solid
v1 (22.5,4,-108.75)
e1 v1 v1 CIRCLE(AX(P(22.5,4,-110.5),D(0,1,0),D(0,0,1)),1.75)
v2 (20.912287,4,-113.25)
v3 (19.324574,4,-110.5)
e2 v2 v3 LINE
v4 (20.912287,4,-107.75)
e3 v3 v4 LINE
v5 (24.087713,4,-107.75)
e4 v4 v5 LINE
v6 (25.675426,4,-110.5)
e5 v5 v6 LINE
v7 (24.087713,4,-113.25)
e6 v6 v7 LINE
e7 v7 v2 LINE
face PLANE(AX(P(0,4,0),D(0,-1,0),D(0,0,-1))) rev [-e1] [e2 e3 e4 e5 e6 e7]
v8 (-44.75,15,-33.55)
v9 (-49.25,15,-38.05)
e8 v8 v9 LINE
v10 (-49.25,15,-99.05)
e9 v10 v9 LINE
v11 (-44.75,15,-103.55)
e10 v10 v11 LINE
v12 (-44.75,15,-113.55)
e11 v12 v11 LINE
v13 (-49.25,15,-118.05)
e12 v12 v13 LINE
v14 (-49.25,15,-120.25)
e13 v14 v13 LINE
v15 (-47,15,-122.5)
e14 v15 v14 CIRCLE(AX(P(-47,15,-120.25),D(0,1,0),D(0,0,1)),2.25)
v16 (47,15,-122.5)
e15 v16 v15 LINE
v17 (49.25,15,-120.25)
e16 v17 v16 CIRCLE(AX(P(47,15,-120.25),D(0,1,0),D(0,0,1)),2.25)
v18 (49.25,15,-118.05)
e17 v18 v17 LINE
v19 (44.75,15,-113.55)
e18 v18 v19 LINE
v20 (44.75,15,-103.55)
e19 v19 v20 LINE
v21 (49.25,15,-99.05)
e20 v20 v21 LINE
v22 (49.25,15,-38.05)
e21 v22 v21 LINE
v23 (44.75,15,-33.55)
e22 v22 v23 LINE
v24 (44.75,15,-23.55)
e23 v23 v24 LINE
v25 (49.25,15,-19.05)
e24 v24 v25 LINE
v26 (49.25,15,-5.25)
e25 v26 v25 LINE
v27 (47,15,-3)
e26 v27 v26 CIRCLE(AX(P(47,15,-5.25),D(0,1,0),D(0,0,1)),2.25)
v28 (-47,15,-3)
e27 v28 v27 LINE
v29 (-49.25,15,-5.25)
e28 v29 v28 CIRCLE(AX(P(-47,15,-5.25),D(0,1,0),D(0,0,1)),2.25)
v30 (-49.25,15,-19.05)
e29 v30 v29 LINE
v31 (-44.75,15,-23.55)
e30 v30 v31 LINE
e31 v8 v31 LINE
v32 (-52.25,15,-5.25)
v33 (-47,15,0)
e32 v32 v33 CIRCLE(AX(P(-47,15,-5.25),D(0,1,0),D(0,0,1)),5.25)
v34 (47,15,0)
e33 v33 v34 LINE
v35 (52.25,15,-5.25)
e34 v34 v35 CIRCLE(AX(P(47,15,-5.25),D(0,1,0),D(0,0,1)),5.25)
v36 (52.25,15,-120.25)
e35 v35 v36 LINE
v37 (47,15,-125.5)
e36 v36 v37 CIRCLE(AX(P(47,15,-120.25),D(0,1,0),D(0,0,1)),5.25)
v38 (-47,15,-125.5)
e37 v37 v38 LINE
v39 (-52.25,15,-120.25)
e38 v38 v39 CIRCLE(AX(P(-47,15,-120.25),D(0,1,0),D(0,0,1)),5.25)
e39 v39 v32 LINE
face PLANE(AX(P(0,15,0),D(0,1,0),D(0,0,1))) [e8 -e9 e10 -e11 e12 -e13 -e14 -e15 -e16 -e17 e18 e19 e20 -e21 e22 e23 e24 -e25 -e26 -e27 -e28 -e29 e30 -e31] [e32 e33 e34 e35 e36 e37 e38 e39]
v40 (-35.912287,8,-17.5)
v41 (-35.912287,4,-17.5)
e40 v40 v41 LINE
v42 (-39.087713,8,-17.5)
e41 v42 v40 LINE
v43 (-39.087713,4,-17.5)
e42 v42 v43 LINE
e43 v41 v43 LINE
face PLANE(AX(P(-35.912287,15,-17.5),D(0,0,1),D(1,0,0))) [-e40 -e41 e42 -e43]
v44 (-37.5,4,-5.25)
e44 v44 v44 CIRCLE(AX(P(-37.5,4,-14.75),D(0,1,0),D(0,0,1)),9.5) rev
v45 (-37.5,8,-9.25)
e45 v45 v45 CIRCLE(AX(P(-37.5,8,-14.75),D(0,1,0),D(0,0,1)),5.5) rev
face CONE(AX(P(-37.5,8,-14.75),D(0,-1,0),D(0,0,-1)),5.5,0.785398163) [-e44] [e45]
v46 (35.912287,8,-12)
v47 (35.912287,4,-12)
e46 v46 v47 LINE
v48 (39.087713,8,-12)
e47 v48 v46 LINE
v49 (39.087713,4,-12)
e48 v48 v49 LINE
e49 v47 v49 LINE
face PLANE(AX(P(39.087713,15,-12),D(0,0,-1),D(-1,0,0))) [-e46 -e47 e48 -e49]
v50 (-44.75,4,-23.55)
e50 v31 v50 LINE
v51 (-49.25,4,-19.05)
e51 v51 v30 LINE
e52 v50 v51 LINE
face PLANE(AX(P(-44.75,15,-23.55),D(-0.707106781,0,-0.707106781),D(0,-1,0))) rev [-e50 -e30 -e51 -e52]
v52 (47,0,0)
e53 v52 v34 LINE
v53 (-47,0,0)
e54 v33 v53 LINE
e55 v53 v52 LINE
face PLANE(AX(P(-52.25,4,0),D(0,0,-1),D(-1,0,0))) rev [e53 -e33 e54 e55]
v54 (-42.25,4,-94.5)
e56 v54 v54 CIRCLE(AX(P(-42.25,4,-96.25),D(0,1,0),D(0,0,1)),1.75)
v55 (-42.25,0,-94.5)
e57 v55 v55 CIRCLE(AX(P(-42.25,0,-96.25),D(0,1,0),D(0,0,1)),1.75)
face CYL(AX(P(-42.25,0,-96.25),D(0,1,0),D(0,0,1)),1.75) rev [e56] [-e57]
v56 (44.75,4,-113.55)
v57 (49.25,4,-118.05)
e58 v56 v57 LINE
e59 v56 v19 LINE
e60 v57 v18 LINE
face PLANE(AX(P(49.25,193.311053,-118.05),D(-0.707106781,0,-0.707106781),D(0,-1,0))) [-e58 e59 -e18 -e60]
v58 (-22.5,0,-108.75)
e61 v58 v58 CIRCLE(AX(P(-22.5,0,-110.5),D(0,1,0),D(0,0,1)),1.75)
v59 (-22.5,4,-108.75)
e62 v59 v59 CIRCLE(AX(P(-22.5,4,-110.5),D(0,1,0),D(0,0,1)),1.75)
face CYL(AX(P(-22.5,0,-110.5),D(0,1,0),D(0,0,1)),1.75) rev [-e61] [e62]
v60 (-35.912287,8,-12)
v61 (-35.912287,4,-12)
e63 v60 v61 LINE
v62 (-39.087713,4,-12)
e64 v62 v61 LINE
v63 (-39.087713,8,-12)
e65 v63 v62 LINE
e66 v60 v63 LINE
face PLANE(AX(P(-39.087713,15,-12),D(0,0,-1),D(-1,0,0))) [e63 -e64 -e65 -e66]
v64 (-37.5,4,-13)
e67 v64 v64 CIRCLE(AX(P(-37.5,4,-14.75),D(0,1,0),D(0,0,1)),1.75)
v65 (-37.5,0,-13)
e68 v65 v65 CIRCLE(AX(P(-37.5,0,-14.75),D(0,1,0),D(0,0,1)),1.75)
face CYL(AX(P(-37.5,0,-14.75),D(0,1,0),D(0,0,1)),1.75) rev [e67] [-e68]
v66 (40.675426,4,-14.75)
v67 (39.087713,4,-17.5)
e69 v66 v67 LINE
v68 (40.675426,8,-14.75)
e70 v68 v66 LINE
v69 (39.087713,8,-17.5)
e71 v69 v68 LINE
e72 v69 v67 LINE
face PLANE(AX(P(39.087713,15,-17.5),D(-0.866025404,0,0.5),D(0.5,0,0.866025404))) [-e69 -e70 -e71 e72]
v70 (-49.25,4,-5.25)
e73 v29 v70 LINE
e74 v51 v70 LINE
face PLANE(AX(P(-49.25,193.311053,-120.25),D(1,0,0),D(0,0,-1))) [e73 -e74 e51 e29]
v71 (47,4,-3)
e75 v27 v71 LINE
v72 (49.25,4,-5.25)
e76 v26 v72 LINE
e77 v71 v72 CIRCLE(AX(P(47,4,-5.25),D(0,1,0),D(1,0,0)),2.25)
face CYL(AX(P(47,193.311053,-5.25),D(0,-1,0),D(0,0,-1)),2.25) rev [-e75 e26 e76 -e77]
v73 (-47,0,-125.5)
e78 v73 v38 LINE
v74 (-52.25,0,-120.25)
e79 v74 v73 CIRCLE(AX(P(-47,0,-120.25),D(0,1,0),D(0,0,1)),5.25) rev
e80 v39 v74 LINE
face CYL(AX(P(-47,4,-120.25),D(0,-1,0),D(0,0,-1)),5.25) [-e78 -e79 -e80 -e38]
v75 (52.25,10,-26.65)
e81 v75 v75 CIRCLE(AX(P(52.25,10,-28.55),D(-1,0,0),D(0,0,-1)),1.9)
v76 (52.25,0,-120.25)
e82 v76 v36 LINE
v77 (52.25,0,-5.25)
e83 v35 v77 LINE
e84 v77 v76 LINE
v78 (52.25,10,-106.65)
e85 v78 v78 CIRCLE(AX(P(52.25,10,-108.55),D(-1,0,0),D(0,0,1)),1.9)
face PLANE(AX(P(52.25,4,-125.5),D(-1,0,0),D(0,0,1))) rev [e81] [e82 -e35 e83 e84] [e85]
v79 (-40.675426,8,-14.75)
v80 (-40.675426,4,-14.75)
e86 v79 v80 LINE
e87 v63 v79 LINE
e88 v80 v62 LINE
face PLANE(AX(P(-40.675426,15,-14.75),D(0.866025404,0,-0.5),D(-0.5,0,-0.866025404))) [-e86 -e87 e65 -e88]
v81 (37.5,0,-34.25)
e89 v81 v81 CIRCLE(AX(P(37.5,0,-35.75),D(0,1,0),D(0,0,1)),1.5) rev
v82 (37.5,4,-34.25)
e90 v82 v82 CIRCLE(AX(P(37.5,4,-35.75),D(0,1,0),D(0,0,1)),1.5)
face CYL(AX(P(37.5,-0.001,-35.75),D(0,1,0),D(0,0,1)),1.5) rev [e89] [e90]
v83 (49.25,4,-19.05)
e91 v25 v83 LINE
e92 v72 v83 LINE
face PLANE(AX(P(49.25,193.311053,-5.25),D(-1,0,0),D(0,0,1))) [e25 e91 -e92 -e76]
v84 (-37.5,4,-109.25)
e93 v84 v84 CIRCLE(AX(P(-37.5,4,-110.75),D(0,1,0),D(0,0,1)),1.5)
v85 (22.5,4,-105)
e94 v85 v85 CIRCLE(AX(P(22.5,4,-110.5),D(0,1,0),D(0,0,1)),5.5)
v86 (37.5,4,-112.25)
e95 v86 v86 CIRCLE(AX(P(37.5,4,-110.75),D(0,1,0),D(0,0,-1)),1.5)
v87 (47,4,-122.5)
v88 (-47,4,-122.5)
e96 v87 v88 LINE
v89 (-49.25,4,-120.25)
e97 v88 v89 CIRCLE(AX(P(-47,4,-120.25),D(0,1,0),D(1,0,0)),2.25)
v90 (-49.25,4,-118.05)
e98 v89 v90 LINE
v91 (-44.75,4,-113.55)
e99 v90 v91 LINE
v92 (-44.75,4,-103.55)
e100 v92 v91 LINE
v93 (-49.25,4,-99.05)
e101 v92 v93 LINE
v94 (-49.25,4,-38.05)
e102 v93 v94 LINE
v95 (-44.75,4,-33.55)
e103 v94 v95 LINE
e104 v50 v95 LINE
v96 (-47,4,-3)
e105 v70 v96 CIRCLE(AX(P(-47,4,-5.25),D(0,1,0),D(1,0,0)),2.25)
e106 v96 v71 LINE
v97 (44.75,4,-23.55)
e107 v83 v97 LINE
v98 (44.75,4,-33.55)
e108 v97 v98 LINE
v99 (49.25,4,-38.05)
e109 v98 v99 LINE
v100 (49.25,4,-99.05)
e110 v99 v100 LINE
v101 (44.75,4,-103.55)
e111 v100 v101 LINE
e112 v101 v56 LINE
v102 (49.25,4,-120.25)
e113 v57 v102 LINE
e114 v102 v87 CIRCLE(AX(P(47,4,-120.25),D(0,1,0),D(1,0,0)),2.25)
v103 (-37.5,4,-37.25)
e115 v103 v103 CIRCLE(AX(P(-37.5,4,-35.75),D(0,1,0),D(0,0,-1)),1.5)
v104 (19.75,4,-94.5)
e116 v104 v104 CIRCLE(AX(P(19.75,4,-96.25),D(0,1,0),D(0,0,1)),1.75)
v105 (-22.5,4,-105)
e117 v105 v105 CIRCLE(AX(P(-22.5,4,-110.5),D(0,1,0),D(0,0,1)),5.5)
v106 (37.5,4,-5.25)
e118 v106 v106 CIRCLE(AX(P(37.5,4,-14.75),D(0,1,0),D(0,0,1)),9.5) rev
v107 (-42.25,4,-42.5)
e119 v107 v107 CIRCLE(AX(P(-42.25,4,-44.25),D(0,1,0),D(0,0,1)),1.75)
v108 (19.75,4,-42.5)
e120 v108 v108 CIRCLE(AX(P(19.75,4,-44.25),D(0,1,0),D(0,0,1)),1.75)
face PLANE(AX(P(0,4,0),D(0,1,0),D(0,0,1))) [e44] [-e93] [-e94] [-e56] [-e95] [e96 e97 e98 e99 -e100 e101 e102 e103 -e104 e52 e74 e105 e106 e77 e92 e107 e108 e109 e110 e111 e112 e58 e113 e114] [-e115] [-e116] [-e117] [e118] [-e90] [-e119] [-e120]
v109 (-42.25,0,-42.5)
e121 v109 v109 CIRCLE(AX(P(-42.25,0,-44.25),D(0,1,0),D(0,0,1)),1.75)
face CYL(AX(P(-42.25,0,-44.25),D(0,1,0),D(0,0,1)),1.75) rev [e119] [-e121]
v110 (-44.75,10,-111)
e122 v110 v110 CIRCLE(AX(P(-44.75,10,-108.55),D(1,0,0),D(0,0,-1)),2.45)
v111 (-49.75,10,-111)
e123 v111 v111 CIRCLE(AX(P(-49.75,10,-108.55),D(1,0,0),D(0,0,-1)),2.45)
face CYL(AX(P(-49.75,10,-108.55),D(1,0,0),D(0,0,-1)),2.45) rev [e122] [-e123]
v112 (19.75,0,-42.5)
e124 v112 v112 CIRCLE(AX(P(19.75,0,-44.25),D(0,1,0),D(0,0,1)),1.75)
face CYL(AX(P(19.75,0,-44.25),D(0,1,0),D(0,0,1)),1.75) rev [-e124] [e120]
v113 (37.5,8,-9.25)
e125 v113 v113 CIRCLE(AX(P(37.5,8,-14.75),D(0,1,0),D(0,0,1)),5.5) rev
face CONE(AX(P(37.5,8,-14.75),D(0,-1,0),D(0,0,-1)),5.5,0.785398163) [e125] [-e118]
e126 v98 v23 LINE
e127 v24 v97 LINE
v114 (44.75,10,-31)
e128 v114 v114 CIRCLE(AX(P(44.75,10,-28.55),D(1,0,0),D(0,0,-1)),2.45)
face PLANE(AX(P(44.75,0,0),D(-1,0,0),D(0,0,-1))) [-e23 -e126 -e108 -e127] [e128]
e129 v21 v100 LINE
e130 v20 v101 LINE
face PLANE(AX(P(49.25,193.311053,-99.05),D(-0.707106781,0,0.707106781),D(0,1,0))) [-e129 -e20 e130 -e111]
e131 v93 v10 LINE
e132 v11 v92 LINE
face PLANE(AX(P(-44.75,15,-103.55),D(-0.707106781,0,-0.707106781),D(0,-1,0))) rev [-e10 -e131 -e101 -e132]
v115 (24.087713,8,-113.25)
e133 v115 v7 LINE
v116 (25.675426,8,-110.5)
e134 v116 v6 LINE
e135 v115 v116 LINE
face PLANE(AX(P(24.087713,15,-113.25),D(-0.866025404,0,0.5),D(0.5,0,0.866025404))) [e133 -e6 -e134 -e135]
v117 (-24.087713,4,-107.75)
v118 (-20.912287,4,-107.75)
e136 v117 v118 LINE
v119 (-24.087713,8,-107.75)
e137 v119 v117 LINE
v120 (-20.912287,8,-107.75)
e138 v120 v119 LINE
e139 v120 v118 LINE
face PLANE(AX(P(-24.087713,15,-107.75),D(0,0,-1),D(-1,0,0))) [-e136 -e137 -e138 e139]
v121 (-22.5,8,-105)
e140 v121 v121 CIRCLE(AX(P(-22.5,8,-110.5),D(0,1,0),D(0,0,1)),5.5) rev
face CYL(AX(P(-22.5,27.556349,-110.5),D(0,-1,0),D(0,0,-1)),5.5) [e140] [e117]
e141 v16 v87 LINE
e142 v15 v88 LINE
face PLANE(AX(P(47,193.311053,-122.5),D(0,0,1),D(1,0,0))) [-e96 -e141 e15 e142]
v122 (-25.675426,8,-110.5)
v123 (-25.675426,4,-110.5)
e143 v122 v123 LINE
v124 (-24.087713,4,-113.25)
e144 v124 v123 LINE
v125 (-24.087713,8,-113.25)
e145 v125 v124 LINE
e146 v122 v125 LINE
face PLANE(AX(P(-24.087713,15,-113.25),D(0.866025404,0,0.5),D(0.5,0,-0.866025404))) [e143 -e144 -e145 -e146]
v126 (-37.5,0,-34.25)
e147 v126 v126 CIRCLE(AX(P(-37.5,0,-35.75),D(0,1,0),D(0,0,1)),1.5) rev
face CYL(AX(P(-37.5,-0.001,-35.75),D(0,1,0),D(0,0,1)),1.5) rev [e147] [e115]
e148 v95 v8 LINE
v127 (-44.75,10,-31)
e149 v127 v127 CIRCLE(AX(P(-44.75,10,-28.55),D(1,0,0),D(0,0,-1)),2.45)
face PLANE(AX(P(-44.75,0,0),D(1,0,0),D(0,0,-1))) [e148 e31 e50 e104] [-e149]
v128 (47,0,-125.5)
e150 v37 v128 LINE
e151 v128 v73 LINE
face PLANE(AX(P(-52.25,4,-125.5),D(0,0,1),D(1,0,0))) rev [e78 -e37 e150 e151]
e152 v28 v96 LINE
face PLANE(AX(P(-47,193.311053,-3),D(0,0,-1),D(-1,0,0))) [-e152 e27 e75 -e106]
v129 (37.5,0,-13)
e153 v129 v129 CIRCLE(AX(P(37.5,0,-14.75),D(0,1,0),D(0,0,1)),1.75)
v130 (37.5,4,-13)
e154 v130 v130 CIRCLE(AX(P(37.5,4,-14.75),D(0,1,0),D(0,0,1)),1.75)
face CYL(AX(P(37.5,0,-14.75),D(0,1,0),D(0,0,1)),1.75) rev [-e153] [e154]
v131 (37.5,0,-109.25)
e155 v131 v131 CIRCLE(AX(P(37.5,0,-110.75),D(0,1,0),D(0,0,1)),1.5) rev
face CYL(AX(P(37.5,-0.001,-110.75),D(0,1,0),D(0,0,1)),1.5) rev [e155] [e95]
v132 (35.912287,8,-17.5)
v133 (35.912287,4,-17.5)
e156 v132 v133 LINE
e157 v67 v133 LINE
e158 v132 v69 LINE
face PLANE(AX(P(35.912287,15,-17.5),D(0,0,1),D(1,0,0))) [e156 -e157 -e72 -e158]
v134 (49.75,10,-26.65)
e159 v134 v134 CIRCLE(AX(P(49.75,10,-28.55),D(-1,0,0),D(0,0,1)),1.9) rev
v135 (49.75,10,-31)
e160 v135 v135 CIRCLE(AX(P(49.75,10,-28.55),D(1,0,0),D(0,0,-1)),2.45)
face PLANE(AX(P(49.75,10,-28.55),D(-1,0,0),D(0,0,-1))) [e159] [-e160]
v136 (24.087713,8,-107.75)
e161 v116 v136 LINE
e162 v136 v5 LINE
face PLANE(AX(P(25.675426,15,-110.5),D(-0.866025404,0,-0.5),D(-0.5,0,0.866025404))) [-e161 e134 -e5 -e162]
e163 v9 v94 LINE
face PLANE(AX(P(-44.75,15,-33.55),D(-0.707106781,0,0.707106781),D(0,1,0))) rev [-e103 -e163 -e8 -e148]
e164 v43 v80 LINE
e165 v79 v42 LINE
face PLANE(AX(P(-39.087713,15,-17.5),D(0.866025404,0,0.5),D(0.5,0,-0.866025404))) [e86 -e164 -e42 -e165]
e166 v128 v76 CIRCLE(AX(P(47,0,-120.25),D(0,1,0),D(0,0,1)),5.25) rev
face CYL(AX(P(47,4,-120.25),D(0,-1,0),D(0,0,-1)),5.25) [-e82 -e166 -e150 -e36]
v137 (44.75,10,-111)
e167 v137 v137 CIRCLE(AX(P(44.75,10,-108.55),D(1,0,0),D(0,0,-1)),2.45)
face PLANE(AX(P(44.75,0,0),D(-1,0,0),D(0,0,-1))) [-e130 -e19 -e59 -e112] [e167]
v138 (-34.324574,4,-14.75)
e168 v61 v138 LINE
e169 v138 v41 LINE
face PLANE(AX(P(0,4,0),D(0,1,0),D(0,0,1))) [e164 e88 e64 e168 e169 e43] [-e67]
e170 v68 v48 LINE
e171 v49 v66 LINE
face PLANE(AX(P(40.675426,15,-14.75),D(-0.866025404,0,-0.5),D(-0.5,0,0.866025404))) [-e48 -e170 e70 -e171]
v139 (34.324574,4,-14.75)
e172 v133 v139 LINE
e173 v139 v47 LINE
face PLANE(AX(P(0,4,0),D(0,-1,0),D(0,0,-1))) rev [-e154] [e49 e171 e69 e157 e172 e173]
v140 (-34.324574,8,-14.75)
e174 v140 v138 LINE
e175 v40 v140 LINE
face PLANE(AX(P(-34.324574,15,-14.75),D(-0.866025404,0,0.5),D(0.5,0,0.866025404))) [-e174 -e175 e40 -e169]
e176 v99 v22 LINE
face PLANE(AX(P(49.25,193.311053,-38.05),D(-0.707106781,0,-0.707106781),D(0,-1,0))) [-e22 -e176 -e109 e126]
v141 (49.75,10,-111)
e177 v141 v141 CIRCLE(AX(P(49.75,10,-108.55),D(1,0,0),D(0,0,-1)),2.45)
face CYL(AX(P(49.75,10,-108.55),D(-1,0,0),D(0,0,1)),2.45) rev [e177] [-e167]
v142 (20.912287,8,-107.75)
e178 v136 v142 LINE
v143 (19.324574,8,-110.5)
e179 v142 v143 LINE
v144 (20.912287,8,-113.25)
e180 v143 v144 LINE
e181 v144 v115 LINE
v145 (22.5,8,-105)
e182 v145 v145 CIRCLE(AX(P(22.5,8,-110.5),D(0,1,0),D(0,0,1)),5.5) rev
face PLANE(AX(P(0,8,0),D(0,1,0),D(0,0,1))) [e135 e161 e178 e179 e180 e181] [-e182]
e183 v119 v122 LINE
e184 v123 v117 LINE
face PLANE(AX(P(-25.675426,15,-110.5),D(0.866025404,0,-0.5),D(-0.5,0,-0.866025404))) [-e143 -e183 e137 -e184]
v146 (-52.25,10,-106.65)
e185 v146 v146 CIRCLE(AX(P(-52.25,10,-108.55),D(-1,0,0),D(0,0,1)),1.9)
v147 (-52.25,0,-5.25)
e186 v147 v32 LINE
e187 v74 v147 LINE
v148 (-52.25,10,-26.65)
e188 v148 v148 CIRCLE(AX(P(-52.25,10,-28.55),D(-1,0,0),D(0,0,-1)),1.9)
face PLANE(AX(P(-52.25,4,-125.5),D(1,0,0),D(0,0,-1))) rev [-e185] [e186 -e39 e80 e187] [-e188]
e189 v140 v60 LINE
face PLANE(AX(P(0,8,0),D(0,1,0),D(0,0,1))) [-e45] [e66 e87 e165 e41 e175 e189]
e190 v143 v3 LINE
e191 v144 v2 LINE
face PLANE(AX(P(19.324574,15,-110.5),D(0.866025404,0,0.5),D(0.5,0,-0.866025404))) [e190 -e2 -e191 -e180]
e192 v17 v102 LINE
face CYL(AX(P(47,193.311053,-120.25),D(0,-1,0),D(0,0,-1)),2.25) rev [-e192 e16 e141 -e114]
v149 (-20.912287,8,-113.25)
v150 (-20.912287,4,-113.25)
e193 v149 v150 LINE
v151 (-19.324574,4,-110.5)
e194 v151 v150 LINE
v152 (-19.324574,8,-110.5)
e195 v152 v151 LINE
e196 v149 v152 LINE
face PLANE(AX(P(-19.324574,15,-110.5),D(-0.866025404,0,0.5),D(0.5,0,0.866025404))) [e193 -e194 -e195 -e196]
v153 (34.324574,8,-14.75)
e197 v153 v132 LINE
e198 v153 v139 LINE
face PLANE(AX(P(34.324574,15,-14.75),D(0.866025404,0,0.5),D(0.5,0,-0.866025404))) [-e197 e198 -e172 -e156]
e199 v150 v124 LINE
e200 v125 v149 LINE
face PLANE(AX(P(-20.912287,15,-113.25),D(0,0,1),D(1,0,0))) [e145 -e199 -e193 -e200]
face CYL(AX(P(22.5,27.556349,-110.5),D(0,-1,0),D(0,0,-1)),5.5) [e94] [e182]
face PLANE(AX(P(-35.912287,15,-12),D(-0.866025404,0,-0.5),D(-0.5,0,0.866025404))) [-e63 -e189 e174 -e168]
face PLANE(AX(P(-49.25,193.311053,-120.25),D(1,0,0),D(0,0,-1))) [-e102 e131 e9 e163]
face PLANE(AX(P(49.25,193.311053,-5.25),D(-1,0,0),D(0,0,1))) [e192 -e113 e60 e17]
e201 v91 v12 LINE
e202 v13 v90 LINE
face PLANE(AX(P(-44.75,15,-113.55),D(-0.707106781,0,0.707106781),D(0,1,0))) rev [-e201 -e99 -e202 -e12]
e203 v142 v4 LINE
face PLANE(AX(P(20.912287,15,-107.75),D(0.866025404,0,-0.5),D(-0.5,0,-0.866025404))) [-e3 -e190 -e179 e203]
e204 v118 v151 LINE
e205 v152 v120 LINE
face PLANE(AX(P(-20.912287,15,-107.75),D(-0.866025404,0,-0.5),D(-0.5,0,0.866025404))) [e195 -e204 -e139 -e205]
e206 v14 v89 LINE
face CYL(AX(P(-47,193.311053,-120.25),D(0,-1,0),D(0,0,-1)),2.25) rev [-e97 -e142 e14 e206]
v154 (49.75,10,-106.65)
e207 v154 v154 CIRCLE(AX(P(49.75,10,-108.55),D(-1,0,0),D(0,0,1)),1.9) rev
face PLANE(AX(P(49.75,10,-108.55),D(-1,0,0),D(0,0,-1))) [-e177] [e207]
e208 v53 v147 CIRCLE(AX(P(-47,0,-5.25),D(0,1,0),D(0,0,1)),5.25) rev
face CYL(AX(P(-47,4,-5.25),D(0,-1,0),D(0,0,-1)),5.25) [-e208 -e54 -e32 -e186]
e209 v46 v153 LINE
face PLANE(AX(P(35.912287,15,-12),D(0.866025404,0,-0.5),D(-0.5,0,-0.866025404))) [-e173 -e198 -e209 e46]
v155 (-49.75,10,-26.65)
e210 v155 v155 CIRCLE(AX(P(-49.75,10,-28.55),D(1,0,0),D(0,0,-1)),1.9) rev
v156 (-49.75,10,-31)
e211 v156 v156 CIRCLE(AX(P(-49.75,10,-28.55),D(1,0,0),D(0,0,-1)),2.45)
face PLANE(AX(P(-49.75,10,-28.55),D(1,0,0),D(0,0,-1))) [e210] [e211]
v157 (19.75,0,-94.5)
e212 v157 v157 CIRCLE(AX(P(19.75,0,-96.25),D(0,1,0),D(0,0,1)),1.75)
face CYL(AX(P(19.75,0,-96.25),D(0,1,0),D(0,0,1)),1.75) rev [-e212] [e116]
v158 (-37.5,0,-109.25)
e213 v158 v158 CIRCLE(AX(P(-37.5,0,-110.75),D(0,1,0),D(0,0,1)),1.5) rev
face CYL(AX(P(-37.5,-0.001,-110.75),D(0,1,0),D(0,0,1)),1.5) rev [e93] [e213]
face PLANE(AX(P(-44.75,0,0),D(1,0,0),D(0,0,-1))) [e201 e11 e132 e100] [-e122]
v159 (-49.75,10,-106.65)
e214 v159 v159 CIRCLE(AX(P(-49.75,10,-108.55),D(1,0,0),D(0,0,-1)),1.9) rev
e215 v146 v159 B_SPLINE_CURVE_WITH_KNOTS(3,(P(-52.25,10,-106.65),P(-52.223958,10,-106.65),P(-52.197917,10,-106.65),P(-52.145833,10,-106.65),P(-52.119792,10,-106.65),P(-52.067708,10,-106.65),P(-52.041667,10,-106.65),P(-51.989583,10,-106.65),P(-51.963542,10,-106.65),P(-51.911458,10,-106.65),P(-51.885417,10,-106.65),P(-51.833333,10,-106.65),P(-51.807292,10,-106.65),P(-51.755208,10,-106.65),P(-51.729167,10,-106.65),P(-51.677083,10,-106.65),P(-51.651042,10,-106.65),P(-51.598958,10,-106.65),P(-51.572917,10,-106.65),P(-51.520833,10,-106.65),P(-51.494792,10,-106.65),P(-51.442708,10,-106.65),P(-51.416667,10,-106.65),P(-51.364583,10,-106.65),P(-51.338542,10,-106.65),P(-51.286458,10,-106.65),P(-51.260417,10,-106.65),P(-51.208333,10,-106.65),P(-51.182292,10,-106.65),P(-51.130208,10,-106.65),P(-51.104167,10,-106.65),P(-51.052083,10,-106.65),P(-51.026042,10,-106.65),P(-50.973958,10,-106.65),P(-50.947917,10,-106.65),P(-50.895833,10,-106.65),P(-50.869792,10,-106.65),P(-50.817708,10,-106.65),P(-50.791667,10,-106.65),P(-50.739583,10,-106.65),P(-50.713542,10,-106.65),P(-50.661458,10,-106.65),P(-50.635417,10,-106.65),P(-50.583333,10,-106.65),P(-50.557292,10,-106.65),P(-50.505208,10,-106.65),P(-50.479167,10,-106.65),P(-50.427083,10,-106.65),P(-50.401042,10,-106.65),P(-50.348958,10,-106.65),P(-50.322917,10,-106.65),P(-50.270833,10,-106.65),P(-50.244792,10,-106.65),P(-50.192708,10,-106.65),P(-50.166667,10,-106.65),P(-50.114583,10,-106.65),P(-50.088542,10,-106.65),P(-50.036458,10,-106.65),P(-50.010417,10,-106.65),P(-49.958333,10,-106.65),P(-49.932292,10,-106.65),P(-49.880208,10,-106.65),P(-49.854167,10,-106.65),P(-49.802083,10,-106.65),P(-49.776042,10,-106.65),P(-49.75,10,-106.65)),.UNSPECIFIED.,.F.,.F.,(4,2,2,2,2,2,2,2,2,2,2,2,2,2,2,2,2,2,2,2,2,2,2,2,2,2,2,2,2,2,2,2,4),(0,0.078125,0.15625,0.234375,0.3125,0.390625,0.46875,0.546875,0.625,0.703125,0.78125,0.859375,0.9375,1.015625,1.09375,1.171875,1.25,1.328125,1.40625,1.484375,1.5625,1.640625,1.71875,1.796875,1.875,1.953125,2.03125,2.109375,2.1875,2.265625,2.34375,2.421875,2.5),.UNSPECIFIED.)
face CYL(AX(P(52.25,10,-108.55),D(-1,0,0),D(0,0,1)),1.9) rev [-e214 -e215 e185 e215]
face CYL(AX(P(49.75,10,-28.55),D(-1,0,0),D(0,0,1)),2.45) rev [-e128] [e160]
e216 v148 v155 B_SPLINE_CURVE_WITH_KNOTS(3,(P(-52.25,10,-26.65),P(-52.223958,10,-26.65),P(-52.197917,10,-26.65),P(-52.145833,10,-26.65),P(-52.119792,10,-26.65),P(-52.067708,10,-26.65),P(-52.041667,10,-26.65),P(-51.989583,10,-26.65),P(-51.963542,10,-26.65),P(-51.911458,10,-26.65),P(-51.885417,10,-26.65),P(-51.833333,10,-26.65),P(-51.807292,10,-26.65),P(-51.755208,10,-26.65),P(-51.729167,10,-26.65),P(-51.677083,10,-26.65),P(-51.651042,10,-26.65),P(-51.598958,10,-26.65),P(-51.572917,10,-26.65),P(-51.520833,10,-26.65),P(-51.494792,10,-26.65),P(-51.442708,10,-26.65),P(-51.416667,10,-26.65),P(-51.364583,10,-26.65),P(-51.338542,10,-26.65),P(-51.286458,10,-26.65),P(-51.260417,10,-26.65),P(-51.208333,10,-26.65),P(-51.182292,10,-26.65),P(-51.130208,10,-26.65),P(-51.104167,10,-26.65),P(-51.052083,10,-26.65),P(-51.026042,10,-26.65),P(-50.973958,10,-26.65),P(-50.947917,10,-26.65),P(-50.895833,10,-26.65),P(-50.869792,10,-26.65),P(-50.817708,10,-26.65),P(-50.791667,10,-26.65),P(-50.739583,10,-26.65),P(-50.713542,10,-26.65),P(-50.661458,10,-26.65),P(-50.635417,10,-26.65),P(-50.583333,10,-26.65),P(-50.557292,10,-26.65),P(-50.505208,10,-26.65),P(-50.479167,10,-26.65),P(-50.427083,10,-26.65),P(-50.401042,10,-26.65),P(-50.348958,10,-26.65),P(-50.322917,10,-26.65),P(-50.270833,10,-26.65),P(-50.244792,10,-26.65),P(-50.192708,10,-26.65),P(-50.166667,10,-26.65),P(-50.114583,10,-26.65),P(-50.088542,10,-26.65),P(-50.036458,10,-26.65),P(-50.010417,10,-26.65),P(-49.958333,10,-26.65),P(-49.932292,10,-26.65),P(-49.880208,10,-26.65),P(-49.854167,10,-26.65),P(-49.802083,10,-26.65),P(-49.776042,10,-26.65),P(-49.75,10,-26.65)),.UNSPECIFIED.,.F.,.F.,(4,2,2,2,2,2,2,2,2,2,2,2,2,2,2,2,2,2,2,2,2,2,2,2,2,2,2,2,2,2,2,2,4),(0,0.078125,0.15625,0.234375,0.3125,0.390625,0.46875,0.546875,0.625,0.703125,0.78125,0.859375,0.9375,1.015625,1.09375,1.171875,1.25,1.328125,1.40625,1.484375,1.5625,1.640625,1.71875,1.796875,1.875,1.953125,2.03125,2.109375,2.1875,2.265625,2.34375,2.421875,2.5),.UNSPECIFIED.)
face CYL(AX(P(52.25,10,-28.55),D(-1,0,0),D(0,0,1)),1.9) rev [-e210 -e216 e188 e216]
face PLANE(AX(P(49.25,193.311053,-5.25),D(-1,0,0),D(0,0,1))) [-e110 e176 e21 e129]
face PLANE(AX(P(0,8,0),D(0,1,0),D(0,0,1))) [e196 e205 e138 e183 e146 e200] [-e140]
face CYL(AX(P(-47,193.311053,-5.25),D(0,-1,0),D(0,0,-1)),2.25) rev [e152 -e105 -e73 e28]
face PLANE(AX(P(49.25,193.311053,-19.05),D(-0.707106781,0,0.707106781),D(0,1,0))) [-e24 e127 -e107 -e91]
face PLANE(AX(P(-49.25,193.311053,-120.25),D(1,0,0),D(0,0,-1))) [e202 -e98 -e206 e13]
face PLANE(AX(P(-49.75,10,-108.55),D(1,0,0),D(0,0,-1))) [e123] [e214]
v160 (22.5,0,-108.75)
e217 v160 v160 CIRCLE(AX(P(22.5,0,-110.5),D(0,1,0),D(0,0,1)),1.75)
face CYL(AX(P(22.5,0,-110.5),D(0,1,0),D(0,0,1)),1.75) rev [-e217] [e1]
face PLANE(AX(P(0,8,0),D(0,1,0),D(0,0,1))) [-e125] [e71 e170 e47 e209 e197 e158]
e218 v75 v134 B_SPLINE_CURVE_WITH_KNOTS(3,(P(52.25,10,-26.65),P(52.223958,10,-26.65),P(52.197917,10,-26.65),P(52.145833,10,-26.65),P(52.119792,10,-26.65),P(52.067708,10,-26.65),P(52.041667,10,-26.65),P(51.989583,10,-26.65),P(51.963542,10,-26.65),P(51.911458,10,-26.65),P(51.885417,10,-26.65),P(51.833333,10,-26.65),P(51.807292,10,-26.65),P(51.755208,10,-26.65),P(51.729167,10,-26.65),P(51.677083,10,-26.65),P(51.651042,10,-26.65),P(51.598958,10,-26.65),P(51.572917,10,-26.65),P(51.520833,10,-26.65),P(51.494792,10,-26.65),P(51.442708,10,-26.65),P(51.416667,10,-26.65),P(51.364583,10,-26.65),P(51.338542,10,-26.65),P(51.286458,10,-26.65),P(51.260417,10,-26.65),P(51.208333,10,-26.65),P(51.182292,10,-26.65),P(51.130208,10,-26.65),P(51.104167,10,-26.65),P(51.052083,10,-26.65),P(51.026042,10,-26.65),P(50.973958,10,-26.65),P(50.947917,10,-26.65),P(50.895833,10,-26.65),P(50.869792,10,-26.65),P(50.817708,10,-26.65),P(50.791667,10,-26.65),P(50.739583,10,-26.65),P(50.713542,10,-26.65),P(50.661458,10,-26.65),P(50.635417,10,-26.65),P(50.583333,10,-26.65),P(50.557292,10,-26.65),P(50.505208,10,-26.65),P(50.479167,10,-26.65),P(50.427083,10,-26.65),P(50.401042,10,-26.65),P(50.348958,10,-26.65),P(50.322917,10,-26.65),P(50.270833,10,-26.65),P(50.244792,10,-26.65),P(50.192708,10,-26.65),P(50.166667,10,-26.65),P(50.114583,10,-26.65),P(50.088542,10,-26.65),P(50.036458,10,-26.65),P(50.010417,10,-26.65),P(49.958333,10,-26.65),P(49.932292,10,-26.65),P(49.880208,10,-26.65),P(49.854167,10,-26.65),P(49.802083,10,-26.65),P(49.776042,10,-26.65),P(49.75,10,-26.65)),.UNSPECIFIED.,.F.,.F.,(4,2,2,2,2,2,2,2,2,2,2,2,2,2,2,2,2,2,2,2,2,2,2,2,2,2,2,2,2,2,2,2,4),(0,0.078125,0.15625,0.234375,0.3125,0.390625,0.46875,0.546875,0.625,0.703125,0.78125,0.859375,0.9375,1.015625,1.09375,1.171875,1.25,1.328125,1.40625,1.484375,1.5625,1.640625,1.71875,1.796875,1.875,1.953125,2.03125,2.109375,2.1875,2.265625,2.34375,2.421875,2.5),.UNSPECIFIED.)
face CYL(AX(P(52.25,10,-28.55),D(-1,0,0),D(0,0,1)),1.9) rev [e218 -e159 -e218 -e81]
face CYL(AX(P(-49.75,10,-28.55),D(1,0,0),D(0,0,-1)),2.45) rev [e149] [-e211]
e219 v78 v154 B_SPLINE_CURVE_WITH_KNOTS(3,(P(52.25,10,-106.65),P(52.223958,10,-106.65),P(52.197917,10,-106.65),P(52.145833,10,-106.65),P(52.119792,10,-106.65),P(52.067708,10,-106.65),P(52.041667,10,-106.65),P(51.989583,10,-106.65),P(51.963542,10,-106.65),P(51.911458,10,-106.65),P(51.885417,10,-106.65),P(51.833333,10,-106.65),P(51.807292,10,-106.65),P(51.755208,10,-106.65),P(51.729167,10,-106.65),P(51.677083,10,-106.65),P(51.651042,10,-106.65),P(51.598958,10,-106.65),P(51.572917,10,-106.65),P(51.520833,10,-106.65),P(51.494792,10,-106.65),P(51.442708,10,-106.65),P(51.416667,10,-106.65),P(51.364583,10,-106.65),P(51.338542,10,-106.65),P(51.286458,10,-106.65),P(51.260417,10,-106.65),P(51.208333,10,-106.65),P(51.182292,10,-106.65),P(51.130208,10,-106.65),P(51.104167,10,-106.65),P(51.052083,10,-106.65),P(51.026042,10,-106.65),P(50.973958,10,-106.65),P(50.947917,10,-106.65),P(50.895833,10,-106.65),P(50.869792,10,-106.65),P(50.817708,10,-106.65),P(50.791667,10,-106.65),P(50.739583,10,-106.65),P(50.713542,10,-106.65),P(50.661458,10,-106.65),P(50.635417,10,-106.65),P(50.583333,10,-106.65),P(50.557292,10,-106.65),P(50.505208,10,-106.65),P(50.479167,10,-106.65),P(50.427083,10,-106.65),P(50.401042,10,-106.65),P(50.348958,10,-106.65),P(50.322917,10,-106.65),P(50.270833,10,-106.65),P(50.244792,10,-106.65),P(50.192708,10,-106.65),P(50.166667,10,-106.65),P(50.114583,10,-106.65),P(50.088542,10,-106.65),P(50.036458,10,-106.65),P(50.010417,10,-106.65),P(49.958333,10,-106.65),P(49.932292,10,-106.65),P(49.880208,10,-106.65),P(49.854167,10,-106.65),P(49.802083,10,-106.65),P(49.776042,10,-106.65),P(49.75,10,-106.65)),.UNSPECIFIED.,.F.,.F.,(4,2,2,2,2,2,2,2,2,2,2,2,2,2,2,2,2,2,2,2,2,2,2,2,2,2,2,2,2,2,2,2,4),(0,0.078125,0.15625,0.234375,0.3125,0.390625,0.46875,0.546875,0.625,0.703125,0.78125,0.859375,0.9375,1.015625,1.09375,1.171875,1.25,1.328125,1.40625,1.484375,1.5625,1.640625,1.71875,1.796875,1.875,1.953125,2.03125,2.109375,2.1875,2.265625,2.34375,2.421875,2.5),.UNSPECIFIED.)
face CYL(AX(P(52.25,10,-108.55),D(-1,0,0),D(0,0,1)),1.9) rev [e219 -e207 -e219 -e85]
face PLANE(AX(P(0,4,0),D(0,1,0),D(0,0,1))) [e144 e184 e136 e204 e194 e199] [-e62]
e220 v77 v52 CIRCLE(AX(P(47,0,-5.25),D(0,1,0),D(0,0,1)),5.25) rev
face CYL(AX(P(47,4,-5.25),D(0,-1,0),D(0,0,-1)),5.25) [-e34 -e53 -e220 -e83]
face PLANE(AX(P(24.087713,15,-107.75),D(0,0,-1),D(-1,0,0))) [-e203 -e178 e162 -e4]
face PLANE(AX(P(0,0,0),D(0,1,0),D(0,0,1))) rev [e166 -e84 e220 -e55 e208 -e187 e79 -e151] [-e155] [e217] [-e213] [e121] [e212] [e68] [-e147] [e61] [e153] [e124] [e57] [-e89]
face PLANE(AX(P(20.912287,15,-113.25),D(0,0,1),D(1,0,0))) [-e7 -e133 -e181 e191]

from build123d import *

# Parameters (mm, degrees)
SKETCH1_W           = 104.5
SKETCH1_H           = 125.5
BOSS_EXTRUDE1_DEPTH = 4
FILLET1_R           = 5.25
EXTRUDE_THIN1_START = 11
EXTRUDE_THIN1_DEPTH = 11
CUT_EXTRUDE2_REACH  = 138.387
SKETCH6_R           = 1.5
SKETCH8_W           = 10
SKETCH8_H           = 11
BOSS_EXTRUDE2_DEPTH = 4.5
CHAMFER2_SIZE       = 4.5
SKETCH5_R           = 1.9
CUT_EXTRUDE3_DEPTH  = 164.998475603
SKETCH10_R          = 2.45
CUT_EXTRUDE4_DEPTH  = 5
SKETCH2_R           = 5.5
BOSS_EXTRUDE3_DEPTH = 8
CUT_EXTRUDE5_DEPTH  = 137.386628743
SKETCH13_R          = 1.75
CUT_EXTRUDE6_DEPTH  = 137.386628743
CHAMFER3_SIZE       = 4
SKETCH14_R          = 1.75
CUT_EXTRUDE7_DEPTH  = 137.386628743


with BuildPart() as part:
    # Sketch1 → Boss-Extrude1 (new body)
    with BuildSketch(Plane(origin=(0, 0, 0), x_dir=(1, 0, 0), z_dir=(0, 1, 0))):
        with Locations((0, 62.75)):
            Rectangle(SKETCH1_W, SKETCH1_H)
    extrude(amount=BOSS_EXTRUDE1_DEPTH)

    # Fillet1
    fillet1_edges = [part.edges().sort_by_distance(p)[0] for p in [
        (-52.25, 2, -125.5),
        (52.25, 2, -125.5),
        (52.25, 2, 0),
        (-52.25, 2, 0),
    ]]
    fillet(fillet1_edges, radius=FILLET1_R)

    # Sketch3 → Extrude-Thin1 (add)
    with BuildSketch(Plane(origin=(0, 4, 0), x_dir=(1, 0, 0), z_dir=(0, 1, 0)).offset(EXTRUDE_THIN1_START)):
        with BuildLine():
            Line((47, 125.5), (-47, 125.5))
            ThreePointArc((-47, 125.5), (-50.712310601, 123.962310601), (-52.25, 120.25))
            Line((-52.25, 120.25), (-52.25, 5.25))
            ThreePointArc((-52.25, 5.25), (-50.712310601, 1.537689399), (-47, 0))
            Line((-47, 0), (47, 0))
            ThreePointArc((47, 0), (50.712310601, 1.537689399), (52.25, 5.25))
            Line((52.25, 5.25), (52.25, 120.25))
            ThreePointArc((52.25, 120.25), (50.712310601, 123.962310601), (47, 125.5))
        make_face()
        with BuildLine():
            Line((47, 122.5), (-47, 122.5))
            ThreePointArc((-47, 122.5), (-48.590990258, 121.840990258), (-49.25, 120.25))
            Line((-49.25, 120.25), (-49.25, 5.25))
            ThreePointArc((-49.25, 5.25), (-48.590990258, 3.659009742), (-47, 3))
            Line((-47, 3), (47, 3))
            ThreePointArc((47, 3), (48.590990258, 3.659009742), (49.25, 5.25))
            Line((49.25, 5.25), (49.25, 120.25))
            ThreePointArc((49.25, 120.25), (48.590990258, 121.840990258), (47, 122.5))
        make_face(mode=Mode.SUBTRACT)
    extrude(amount=-EXTRUDE_THIN1_DEPTH)

    # Sketch6 → Cut-Extrude2 (cut, up to next)
    with BuildSketch(Plane(origin=(0, 4, 0), x_dir=(1, 0, 0), z_dir=(0, 1, 0)), mode=Mode.PRIVATE) as cut_extrude2_sk1:
        with Locations(Location((-37.5, 110.75, 0), (0, 0, 270))):
            Circle(SKETCH6_R)
    cut_extrude2_tool1 = extrude(cut_extrude2_sk1.sketch, amount=-CUT_EXTRUDE2_REACH, mode=Mode.PRIVATE) & part.part
    # Sketch6 → Cut-Extrude2 (cut, up to next)
    with BuildSketch(Plane(origin=(0, 4, 0), x_dir=(1, 0, 0), z_dir=(0, 1, 0)), mode=Mode.PRIVATE) as cut_extrude2_sk2:
        with Locations(Location((37.5, 110.75, 0), (0, 0, 270))):
            Circle(SKETCH6_R)
    cut_extrude2_tool2 = extrude(cut_extrude2_sk2.sketch, amount=-CUT_EXTRUDE2_REACH, mode=Mode.PRIVATE) & part.part
    # Sketch6 → Cut-Extrude2 (cut, up to next)
    with BuildSketch(Plane(origin=(0, 4, 0), x_dir=(1, 0, 0), z_dir=(0, 1, 0)), mode=Mode.PRIVATE) as cut_extrude2_sk3:
        with Locations(Location((37.5, 35.75, 0), (0, 0, 270))):
            Circle(SKETCH6_R)
    cut_extrude2_tool3 = extrude(cut_extrude2_sk3.sketch, amount=-CUT_EXTRUDE2_REACH, mode=Mode.PRIVATE) & part.part
    # Sketch6 → Cut-Extrude2 (cut, up to next)
    with BuildSketch(Plane(origin=(0, 4, 0), x_dir=(1, 0, 0), z_dir=(0, 1, 0)), mode=Mode.PRIVATE) as cut_extrude2_sk4:
        with Locations(Location((-37.5, 35.75, 0), (0, 0, 270))):
            Circle(SKETCH6_R)
    cut_extrude2_tool4 = extrude(cut_extrude2_sk4.sketch, amount=-CUT_EXTRUDE2_REACH, mode=Mode.PRIVATE) & part.part
    add(cut_extrude2_tool1.solids().sort_by_distance((-37.5, 4, -110.75))[0], mode=Mode.SUBTRACT)
    add(cut_extrude2_tool2.solids().sort_by_distance((37.5, 4, -110.75))[0], mode=Mode.SUBTRACT)
    add(cut_extrude2_tool3.solids().sort_by_distance((37.5, 4, -35.75))[0], mode=Mode.SUBTRACT)
    add(cut_extrude2_tool4.solids().sort_by_distance((-37.5, 4, -35.75))[0], mode=Mode.SUBTRACT)

    # Sketch8 → Boss-Extrude2 (add)
    with BuildSketch(Plane(origin=(-49.25, 0, 0), x_dir=(0, 0, -1), z_dir=(1, 0, 0))):
        with Locations((28.55, 9.5)):
            Rectangle(SKETCH8_W, SKETCH8_H)
        with Locations((108.55, 9.5)):
            Rectangle(SKETCH8_W, SKETCH8_H)
    boss_extrude2 = extrude(amount=BOSS_EXTRUDE2_DEPTH)

    # Mirror4: Boss-Extrude2 across plane
    add(boss_extrude2.mirror(Plane(origin=(0, 0, 0), x_dir=(0, 0, 1), z_dir=(1, 0, 0))))

    # Chamfer2
    chamfer2_edges = [part.edges().sort_by_distance(p)[0] for p in [
        (-49.25, 9.5, -113.55),
        (-49.25, 9.5, -103.55),
        (-49.25, 9.5, -33.55),
        (-49.25, 9.5, -23.55),
        (49.25, 9.5, -113.55),
        (49.25, 9.5, -103.55),
        (49.25, 9.5, -23.55),
        (49.25, 9.5, -33.55),
    ]]
    chamfer(chamfer2_edges, length=CHAMFER2_SIZE - 0.0001)  # a hair under: the kernel refuses the full size

    # Sketch5 → Cut-Extrude3 (cut, through all)
    with BuildSketch(Plane.ZY.offset(52.25)):
        with Locations((-108.55, 10)):
            Circle(SKETCH5_R)
        with Locations((-28.55, 10)):
            Circle(SKETCH5_R)
    extrude(amount=-CUT_EXTRUDE3_DEPTH, mode=Mode.SUBTRACT)

    # Sketch10 → Cut-Extrude4 (cut)
    with BuildSketch(Plane(origin=(-44.75, 0, 0), x_dir=(0, 0, -1), z_dir=(1, 0, 0))):
        with Locations((28.55, 10)):
            Circle(SKETCH10_R)
        with Locations((108.55, 10)):
            Circle(SKETCH10_R)
    cut_extrude4 = extrude(amount=-CUT_EXTRUDE4_DEPTH, mode=Mode.SUBTRACT)

    # Sketch2 → Boss-Extrude3 (add)
    with BuildSketch(Plane.XZ):
        with Locations(Location((-37.5, -14.75, 0), (0, 0, 90))):
            Circle(SKETCH2_R)
        with Locations(Location((37.5, -14.75, 0), (0, 0, 90))):
            Circle(SKETCH2_R)
        with Locations(Location((-22.5, -110.5, 0), (0, 0, 90))):
            Circle(SKETCH2_R)
        with Locations(Location((22.5, -110.5, 0), (0, 0, 90))):
            Circle(SKETCH2_R)
    extrude(amount=-BOSS_EXTRUDE3_DEPTH)

    # Sketch12 → Cut-Extrude5 (cut, through all)
    with BuildSketch(Plane(origin=(0, 4, 0), x_dir=(1, 0, 0), z_dir=(0, 1, 0))):
        Polygon((-34.324573519, 14.75), (-35.91228676, 17.5), (-39.08771324, 17.5), (-40.675426481, 14.75), (-39.08771324, 12), (-35.91228676, 12), align=None)
        Polygon((35.91228676, 12), (34.324573519, 14.75), (35.91228676, 17.5), (39.08771324, 17.5), (40.675426481, 14.75), (39.08771324, 12), align=None)
        Polygon((25.675426481, 110.5), (24.08771324, 107.75), (20.91228676, 107.75), (19.324573519, 110.5), (20.91228676, 113.25), (24.08771324, 113.25), align=None)
        Polygon((-19.324573519, 110.5), (-20.91228676, 113.25), (-24.08771324, 113.25), (-25.675426481, 110.5), (-24.08771324, 107.75), (-20.91228676, 107.75), align=None)
    extrude(amount=CUT_EXTRUDE5_DEPTH, mode=Mode.SUBTRACT)

    # Sketch13 → Cut-Extrude6 (cut, through all)
    with BuildSketch(Plane(origin=(0, 4, 0), x_dir=(1, 0, 0), z_dir=(0, 1, 0))):
        with Locations(Location((37.5, 14.75, 0), (0, 0, 270))):
            Circle(SKETCH13_R)
        with Locations(Location((-37.5, 14.75, 0), (0, 0, 270))):
            Circle(SKETCH13_R)
        with Locations(Location((-22.5, 110.5, 0), (0, 0, 270))):
            Circle(SKETCH13_R)
        with Locations(Location((22.5, 110.5, 0), (0, 0, 270))):
            Circle(SKETCH13_R)
    extrude(amount=-CUT_EXTRUDE6_DEPTH, mode=Mode.SUBTRACT)

    # Chamfer3
    chamfer3_edges = [part.edges().sort_by_distance(p)[0] for p in [
        (-37.5, 4, -20.25),
        (37.5, 4, -20.25),
    ]]
    chamfer(chamfer3_edges, length=CHAMFER3_SIZE - 0.0001)  # a hair under: the kernel refuses the full size

    # Sketch14 → Cut-Extrude7 (cut, through all)
    with BuildSketch(Plane(origin=(0, 4, 0), x_dir=(1, 0, 0), z_dir=(0, 1, 0))):
        with Locations(Location((-42.25, 96.25, 0), (0, 0, 270))):
            Circle(SKETCH14_R)
        with Locations(Location((19.75, 96.25, 0), (0, 0, 270))):
            Circle(SKETCH14_R)
        with Locations(Location((19.75, 44.25, 0), (0, 0, 270))):
            Circle(SKETCH14_R)
        with Locations(Location((-42.25, 44.25, 0), (0, 0, 270))):
            Circle(SKETCH14_R)
    extrude(amount=-CUT_EXTRUDE7_DEPTH, mode=Mode.SUBTRACT)

    # Mirror5: Cut-Extrude4 across plane
    add(cut_extrude4.mirror(Plane(origin=(0, 0, 0), x_dir=(0, 0, 1), z_dir=(1, 0, 0))), mode=Mode.SUBTRACT)


solid = part.part
